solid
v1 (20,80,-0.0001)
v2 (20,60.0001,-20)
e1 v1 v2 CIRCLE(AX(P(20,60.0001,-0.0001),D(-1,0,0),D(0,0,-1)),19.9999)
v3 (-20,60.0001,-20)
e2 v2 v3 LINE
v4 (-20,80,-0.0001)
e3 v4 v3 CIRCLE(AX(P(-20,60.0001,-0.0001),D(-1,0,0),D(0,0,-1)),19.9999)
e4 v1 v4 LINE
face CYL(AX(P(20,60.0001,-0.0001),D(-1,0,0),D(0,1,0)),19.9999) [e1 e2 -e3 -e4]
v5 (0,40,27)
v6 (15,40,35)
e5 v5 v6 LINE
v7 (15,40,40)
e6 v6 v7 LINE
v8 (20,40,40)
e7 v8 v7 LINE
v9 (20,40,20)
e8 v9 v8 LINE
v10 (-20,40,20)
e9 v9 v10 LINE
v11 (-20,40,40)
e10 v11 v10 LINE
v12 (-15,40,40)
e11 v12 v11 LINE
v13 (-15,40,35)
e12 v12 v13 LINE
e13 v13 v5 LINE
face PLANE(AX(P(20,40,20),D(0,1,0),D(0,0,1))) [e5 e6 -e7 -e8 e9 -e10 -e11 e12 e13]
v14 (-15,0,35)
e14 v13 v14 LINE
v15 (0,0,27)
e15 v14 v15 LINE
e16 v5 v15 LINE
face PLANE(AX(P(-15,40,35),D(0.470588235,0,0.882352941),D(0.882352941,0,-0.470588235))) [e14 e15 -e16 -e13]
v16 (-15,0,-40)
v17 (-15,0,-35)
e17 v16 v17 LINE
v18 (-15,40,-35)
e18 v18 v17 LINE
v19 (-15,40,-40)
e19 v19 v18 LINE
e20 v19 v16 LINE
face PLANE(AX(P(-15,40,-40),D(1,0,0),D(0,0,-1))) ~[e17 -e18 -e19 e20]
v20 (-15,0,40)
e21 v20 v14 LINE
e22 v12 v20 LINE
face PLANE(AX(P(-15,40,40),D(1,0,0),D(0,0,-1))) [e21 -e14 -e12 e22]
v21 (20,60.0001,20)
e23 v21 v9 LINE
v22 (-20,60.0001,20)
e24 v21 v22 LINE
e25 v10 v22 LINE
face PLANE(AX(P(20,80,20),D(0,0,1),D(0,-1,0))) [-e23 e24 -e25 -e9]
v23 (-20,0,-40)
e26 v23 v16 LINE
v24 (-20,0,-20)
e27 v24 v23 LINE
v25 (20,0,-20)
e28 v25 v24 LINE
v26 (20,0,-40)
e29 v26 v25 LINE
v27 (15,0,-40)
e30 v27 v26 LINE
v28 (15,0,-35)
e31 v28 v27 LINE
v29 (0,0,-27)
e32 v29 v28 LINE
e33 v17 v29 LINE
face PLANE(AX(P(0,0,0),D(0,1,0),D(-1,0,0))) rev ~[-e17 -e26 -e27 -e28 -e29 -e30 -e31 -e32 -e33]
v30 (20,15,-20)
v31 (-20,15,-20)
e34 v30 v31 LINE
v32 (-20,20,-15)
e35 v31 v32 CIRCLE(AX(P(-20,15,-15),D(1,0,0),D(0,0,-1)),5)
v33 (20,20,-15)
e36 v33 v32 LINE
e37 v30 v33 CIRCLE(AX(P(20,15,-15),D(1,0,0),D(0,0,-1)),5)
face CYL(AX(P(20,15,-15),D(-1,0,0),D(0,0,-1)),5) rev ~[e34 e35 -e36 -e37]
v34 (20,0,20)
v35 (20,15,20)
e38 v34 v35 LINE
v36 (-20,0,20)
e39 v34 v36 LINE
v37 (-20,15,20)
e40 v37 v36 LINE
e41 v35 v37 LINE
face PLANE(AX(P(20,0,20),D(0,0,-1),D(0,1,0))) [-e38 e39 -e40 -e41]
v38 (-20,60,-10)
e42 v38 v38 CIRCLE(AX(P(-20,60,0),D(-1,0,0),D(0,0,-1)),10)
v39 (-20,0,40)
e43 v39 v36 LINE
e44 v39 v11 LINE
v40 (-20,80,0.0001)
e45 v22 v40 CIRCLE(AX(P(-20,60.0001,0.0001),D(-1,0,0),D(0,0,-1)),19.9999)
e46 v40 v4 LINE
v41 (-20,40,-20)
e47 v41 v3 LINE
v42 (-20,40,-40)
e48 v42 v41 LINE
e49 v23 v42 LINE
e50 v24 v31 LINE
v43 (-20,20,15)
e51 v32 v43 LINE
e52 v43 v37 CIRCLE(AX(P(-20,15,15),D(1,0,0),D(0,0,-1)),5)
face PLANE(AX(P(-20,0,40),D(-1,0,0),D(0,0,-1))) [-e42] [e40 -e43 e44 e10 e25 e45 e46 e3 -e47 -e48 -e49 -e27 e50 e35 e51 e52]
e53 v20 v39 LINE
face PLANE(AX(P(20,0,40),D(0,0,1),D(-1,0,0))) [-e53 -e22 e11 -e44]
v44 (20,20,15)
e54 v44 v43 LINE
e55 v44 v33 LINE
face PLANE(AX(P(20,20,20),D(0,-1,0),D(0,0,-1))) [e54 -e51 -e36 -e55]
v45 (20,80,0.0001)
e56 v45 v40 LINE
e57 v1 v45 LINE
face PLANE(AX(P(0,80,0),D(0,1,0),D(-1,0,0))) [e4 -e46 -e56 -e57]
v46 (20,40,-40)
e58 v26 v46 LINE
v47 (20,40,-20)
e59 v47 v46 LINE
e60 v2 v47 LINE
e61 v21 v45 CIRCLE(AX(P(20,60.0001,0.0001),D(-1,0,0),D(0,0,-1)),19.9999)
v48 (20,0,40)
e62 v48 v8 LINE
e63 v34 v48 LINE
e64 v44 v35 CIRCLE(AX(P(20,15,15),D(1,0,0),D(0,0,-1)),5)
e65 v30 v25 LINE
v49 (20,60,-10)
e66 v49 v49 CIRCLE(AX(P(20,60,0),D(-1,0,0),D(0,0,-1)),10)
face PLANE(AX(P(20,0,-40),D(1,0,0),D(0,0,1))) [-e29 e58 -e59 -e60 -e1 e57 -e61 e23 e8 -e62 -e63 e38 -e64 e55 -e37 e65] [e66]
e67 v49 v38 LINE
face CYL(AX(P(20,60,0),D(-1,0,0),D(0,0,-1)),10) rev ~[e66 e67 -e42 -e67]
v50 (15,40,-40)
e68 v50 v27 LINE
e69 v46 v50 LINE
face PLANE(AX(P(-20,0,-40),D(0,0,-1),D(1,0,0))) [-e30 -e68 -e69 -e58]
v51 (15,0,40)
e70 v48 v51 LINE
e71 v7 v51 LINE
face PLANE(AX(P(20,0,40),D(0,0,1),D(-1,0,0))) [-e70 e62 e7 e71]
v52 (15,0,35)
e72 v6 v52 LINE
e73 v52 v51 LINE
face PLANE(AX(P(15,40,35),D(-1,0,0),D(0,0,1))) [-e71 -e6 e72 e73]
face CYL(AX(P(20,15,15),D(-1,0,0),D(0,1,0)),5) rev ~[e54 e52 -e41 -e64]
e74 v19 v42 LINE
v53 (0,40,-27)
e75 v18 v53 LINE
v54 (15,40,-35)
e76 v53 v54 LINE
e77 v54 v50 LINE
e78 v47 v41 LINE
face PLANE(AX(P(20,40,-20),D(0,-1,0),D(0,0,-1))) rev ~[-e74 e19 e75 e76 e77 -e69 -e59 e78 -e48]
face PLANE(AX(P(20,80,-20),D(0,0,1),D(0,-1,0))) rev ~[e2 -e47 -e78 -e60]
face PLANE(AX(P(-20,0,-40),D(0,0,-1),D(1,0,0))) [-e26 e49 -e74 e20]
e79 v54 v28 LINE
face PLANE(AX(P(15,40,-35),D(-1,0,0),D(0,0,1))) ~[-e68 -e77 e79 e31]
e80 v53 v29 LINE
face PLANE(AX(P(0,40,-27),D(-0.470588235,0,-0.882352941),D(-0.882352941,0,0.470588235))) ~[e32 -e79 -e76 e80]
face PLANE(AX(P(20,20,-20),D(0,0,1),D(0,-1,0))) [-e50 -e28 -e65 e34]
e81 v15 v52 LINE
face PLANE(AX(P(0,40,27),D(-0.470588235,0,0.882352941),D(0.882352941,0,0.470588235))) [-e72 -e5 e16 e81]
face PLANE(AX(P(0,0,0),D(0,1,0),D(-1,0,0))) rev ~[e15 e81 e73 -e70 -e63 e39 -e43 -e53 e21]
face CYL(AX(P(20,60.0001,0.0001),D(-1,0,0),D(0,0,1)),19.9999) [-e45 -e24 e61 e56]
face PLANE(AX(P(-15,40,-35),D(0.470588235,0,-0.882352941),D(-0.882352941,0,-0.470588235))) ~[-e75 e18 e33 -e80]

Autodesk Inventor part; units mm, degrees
ref_plane "YZ Plane" through (0, 0, 0) normal (1, 0, 0) x (0, 1, 0)
ref_plane "XZ Plane" through (0, 0, 0) normal (0, 1, 0) x (-1, 0, 0)
ref_plane "XY Plane" through (0, 0, 0) normal (0, 0, 1) x (1, 0, 0)
sketch "Esboço1" plane through (0, 0, 0) normal (0, 1, 0) x (-1, 0, 0)
  line L0 (20, -40) -> (-20, -40)
  line L1 (-20, -40) -> (-20, 40)
  line L2 (-20, 40) -> (20, 40)
  line L3 (20, 40) -> (20, -40)
  line L4 (20, -40) -> (-20, 40) construction
  line L5 (-20, -40) -> (20, 40) construction
  point P0 (0, 0)
  dimension "d0" = 40
  dimension "d1" = 80
extrude "Extrusão1" add sketch "Esboço1" along normal blind 80
sketch "Esboço2" plane through (20, 0, 40) normal (1, 0, 0) x (0, 0, -1)
  line L0 (0, 80) -> (20, 80)
  line L1 (20, 80) -> (20, 40)
  line L2 (20, 40) -> (0, 40)
  line L3 (0, 40) -> (0, 80)
  line L4 (80, 80) -> (60, 80)
  line L5 (60, 80) -> (60, 40)
  line L6 (60, 40) -> (80, 40)
  line L7 (80, 40) -> (80, 80)
  line L8 (0, 0) -> (80, 0) projected
  point P0 (40, 0)
  dimension "d4" = 20
  dimension "d5" = 20
  dimension "d6" = 40
extrude "Extrusão2" cut sketch "Esboço2" against normal through all contours L0 L1 L2 L3
extrude "Extrusão3" cut sketch "Esboço2" against normal through all contours L7 L6 L5 L4
fillet "Arredondamento1" radius 20 2 edges at (0, 80, 20) (0, 80, -20)
sketch "Esboço3" plane through (20, 0, 40) normal (1, 0, 0) x (0, 0, -1)
  arc A0 (60, 60) -> (20, 60) centre (40, 60) ccw projected
  point P0 (40, 0)
hole "Furo1" at (20, 60, 0) direction (-1, 0, 0) diameter 20 end through all
sketch "Esboço4" plane through (20, 40, 40) normal (0, 1, 0) x (1, 0, 0)
  line L0 (-35, 0) -> (-35, 5)
  line L1 (-35, 5) -> (-20, 13)
  line L2 (-20, 13) -> (-5, 5)
  line L3 (-5, 5) -> (-5, 0)
  line L4 (-40, 0) -> (-40, 20) projected
  line L5 (0, 0) -> (-40, 0) projected
  point P0 (-20, 40)
  dimension "d19" = 5
  dimension "d20" = 30
  dimension "d21" = 20
  dimension "d22" = 13
  dimension "d23" = 5
extrude "Extrusão4" cut sketch "Esboço4" against normal through all
mirror "Espelhar1" about plane through (0, 0, 0) normal (0, 0, 1) of "Extrusão4"
sketch "Esboço6" plane through (20, 0, 40) normal (1, 0, 0) x (0, 0, -1)
  line L0 (20, 20) -> (60, 20)
  line L1 (60, 20) -> (60, 0)
  line L2 (60, 0) -> (20, 0)
  line L3 (20, 0) -> (20, 20)
  line L4 (0, 0) -> (80, 0) projected
  point P0 (40, 0)
  point P1 (40, 0)
  dimension "d26" = 40
  dimension "d27" = 20
extrude "Extrusão5" cut sketch "Esboço6" against normal through all
fillet "Arredondamento2" radius 5 2 edges at (0, 20, -20) (0, 20, 20)
properties part number "3D Model"
